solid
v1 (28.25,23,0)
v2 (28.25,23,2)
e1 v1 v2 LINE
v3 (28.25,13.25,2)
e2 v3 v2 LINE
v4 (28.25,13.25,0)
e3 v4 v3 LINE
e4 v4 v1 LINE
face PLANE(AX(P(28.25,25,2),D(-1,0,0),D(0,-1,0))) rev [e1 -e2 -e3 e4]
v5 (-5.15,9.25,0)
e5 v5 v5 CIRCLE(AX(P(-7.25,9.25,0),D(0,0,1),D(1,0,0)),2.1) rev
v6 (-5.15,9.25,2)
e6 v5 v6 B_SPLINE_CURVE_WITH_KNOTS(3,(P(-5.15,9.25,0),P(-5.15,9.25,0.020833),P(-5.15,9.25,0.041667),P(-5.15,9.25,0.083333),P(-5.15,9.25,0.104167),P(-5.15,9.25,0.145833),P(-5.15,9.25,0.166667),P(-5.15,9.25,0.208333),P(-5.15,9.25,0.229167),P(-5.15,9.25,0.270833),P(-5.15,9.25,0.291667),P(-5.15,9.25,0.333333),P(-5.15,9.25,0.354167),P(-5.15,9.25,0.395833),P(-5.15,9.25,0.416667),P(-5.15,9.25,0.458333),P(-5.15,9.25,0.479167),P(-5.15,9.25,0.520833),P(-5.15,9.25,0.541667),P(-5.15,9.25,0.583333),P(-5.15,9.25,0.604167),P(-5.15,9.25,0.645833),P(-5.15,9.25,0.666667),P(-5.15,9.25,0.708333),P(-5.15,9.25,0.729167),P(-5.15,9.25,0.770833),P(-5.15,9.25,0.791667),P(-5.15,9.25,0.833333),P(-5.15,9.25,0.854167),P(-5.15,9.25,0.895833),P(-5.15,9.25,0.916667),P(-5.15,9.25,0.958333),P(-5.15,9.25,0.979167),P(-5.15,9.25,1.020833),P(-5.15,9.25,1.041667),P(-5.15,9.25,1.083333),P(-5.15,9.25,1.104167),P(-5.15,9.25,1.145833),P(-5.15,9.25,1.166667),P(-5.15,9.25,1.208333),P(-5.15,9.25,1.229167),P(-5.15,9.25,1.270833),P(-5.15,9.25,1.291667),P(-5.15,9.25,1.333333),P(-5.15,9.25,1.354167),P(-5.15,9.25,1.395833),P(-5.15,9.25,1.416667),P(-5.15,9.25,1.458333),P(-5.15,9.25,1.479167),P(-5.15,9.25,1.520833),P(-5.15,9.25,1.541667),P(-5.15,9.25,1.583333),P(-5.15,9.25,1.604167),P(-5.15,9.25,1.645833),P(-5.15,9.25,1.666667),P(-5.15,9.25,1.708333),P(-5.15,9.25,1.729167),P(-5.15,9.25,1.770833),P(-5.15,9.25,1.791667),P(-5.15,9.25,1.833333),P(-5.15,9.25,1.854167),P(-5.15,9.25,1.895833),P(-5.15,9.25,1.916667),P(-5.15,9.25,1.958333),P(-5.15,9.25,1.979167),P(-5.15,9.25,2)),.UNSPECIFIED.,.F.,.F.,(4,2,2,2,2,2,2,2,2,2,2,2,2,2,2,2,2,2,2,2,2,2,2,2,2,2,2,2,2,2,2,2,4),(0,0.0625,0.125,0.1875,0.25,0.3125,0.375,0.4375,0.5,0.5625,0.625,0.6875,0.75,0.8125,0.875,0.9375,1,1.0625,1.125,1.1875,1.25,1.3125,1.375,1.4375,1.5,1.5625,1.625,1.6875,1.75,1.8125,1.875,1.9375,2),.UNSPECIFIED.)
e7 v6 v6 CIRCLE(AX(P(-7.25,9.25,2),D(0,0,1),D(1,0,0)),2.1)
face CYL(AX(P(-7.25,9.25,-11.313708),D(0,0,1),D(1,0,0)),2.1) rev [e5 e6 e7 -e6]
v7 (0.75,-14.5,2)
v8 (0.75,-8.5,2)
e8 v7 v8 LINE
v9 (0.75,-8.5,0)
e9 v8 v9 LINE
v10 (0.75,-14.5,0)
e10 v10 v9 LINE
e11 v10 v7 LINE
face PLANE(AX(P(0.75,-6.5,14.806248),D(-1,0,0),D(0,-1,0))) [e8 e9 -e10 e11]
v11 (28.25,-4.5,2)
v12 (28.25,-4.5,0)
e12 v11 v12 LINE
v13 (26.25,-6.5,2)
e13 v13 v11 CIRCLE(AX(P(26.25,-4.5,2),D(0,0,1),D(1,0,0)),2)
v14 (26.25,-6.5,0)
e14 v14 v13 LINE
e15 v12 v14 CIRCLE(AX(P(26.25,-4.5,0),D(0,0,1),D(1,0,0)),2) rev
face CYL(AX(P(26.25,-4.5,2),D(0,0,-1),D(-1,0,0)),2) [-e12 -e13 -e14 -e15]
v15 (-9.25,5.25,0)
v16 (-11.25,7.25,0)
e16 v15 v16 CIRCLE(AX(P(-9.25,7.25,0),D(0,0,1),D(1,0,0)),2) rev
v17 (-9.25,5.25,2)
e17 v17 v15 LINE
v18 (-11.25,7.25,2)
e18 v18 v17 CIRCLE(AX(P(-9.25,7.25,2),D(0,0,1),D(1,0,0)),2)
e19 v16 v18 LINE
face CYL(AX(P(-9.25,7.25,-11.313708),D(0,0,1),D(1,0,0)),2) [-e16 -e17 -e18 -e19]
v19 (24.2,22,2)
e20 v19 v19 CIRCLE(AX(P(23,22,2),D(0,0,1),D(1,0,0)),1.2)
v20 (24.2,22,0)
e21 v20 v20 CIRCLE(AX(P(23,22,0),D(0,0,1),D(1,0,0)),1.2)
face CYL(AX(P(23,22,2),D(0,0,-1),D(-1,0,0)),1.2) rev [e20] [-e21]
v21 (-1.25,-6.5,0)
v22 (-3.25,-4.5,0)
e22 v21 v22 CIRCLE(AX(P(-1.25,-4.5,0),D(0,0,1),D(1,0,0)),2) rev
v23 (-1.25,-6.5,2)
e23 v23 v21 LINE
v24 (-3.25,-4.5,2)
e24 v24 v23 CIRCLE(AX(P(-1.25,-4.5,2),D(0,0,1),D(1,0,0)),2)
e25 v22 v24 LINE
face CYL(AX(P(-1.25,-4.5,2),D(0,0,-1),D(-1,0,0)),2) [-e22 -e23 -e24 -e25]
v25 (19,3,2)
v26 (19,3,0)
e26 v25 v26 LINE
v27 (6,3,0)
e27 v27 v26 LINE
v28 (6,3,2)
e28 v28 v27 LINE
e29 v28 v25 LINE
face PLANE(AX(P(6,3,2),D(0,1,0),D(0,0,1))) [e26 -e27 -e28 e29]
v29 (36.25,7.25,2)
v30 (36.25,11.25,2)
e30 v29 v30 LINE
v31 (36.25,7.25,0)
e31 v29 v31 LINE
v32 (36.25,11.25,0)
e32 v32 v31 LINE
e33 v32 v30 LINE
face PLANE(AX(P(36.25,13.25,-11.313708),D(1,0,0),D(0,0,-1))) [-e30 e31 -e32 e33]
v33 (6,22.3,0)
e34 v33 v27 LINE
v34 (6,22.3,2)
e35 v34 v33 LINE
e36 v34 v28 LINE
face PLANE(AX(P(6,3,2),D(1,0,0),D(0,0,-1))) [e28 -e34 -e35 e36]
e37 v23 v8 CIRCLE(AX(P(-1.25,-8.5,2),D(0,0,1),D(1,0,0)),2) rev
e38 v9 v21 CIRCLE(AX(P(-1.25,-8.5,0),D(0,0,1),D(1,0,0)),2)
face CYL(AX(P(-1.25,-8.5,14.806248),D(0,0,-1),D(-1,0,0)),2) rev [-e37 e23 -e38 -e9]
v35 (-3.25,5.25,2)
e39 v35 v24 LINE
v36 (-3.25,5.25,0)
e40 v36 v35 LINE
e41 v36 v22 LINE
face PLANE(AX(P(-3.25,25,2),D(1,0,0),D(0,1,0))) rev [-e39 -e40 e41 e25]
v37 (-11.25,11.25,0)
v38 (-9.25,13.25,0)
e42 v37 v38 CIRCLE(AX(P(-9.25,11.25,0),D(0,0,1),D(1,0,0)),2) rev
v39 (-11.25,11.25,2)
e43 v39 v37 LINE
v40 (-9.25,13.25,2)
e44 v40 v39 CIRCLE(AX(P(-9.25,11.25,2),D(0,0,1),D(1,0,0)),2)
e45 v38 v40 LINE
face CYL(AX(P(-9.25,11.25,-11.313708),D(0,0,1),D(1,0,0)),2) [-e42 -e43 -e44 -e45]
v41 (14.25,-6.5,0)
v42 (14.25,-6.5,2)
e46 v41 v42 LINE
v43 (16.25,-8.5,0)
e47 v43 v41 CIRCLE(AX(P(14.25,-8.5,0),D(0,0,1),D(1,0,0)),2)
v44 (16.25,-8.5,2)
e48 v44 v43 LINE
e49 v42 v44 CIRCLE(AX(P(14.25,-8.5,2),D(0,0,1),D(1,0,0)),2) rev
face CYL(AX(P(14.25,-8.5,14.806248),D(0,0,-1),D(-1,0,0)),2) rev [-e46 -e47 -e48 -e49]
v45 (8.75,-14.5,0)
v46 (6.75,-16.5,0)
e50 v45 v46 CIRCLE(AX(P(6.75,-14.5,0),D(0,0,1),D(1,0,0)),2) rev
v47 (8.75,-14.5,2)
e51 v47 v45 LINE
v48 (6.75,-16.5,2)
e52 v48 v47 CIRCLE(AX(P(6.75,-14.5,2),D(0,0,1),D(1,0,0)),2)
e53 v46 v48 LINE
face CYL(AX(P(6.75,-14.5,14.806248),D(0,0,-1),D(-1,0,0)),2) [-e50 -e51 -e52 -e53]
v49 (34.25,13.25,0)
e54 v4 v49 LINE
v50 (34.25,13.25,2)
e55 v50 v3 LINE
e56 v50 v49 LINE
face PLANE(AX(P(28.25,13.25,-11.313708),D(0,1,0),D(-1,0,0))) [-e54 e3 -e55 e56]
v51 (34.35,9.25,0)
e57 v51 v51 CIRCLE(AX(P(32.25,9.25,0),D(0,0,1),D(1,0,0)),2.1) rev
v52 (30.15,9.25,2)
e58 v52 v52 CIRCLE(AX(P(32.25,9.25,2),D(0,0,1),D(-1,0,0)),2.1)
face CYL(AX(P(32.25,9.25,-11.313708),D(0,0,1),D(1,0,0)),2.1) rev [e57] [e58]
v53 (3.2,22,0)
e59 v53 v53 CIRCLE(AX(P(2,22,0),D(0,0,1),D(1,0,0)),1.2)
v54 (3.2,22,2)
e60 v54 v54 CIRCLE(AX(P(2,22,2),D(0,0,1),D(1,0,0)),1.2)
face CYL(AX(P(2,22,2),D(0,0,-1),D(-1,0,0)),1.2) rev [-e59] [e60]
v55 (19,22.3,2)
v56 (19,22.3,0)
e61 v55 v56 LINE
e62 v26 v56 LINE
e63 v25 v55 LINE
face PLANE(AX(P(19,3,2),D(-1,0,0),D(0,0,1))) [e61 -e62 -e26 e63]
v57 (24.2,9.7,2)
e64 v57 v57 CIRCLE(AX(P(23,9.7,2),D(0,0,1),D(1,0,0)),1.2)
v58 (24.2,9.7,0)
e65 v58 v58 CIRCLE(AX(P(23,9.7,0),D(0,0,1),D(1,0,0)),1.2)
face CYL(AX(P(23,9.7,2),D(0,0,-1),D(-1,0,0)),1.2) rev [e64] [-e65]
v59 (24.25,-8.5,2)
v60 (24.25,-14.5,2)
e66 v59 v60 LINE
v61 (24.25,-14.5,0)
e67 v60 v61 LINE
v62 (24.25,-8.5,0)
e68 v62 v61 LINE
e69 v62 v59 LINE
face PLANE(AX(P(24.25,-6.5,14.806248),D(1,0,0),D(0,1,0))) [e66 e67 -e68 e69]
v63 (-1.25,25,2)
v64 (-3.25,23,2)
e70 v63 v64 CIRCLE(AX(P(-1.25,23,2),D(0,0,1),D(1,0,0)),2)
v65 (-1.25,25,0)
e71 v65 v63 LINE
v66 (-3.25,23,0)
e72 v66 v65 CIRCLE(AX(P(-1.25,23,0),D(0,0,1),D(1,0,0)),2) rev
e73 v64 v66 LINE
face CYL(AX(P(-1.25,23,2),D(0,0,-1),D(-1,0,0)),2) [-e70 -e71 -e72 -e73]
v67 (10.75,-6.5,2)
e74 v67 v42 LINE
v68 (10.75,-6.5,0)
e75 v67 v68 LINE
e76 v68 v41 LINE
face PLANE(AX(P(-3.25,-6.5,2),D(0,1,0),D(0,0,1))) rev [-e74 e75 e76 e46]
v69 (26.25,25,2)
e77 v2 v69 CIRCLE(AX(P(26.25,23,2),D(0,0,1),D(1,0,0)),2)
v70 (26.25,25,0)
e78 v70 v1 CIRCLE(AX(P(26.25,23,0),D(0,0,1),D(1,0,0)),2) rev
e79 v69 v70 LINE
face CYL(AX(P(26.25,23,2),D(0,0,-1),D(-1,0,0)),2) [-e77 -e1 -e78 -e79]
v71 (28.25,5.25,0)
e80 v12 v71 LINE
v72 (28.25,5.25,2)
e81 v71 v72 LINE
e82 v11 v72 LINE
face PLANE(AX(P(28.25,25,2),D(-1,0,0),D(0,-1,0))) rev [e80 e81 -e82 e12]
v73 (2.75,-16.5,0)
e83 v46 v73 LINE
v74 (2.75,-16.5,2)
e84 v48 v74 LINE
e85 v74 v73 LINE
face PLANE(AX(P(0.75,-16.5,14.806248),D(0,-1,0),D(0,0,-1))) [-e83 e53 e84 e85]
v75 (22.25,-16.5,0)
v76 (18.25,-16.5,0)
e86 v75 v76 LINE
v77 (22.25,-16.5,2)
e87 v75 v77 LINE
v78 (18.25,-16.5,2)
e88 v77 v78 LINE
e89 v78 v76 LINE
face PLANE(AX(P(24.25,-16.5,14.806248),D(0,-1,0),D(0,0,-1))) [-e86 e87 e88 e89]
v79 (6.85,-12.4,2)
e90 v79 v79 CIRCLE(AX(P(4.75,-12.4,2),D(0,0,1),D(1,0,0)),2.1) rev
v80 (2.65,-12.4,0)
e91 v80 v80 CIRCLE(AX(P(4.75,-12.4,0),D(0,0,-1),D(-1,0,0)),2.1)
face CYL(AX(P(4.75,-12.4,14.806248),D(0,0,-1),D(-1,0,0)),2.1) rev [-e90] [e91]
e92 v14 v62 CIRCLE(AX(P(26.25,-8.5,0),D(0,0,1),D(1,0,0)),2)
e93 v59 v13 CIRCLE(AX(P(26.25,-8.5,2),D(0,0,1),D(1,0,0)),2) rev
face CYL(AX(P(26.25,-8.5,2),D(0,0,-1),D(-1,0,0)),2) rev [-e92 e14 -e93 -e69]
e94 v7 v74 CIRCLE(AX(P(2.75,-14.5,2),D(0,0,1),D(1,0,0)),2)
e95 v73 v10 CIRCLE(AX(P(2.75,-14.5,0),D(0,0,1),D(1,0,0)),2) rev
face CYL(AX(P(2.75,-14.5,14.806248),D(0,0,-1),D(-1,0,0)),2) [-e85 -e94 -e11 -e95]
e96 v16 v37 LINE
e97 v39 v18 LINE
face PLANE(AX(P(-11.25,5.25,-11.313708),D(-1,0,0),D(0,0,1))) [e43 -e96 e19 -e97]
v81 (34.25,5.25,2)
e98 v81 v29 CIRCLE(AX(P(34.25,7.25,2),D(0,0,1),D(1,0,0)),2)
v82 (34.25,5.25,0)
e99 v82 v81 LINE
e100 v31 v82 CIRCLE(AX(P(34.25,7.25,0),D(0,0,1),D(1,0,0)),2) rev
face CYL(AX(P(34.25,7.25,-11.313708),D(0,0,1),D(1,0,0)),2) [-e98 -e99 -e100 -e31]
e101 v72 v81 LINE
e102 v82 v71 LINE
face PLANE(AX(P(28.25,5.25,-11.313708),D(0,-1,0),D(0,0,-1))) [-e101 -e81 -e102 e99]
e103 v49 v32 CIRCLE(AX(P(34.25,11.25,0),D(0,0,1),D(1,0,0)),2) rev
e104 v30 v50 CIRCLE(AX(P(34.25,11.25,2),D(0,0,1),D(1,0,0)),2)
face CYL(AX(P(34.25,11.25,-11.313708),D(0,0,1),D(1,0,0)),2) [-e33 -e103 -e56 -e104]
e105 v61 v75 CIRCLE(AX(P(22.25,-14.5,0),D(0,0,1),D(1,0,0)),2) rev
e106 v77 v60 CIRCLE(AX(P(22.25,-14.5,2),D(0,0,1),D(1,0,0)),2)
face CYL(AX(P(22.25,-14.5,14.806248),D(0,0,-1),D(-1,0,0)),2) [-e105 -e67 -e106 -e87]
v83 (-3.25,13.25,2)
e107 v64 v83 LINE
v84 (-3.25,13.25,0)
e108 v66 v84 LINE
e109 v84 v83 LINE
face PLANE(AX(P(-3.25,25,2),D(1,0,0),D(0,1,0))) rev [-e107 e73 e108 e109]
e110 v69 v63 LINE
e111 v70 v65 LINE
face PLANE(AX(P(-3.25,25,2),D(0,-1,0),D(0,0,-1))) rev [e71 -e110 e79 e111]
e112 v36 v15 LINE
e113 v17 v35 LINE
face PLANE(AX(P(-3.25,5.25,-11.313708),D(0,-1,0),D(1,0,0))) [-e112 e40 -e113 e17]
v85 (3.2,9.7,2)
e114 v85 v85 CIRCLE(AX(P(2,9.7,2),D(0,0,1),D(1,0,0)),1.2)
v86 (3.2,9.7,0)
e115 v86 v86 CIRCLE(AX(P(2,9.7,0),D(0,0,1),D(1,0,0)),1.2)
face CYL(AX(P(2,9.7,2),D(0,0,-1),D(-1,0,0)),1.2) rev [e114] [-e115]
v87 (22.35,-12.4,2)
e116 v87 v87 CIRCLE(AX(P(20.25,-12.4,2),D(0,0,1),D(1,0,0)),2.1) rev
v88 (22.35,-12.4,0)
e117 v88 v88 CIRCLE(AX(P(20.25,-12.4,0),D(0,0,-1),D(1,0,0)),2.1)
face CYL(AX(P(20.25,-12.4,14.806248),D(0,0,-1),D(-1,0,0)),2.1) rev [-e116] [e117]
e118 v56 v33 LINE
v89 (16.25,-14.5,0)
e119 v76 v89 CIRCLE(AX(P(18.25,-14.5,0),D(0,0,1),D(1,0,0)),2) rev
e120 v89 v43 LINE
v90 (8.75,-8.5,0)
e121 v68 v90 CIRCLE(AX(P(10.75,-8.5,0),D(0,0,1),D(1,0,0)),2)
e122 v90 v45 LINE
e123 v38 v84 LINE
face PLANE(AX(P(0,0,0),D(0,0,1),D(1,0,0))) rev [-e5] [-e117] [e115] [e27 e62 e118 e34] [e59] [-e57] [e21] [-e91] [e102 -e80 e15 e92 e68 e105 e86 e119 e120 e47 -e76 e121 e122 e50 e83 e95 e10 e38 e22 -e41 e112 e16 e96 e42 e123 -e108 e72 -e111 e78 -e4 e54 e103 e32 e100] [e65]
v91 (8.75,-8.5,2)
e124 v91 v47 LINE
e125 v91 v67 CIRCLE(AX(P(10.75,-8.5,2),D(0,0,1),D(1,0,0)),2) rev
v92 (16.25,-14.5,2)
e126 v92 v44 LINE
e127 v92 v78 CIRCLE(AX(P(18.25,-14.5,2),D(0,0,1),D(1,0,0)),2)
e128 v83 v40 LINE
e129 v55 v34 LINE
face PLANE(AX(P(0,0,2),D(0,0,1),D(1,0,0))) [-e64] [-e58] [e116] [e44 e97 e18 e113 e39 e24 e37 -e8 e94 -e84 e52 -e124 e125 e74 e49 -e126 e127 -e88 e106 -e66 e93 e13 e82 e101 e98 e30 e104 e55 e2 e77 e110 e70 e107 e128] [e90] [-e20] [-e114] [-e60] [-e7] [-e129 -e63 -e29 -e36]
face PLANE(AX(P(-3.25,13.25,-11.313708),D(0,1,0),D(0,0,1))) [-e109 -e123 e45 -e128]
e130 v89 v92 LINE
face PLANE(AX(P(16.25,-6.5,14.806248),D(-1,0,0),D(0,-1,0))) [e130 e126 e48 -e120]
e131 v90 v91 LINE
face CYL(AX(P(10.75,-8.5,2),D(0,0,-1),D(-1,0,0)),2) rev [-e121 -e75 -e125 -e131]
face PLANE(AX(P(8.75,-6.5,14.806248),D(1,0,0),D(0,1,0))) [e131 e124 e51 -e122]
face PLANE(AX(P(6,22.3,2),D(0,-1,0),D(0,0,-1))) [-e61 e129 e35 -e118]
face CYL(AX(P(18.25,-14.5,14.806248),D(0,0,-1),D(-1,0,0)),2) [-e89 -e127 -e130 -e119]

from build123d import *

# Parameters (mm, degrees)
SKETCH1_W             = 31.5
SKETCH1_H             = 31.5
SKETCH1_R             = 1.2
SKETCH1_W_2           = 13
SKETCH1_H_2           = 19.3
BOSS_EXTRUDE1_DEPTH   = 2
SKETCH4_W             = 8
SKETCH4_H             = 8
SKETCH4_R             = 2.1
BOSS_EXTRUDE3_DEPTH   = 2
CIRPATTERN2_OUTLINE_W = 8
CIRPATTERN2_OUTLINE_H = 8
CIRPATTERN2_OUTLINE_R = 2.1
CIRPATTERN2_DEPTH     = 2
SKETCH5_W             = 8
SKETCH5_H             = 10
SKETCH5_R             = 2.1
BOSS_EXTRUDE4_DEPTH   = 2
FILLET1_R             = 2


# Read off the part's stored shape, not the designer's step: CirPattern2
with BuildPart() as part:
    # Sketch1 → Boss-Extrude1 (new body)
    with BuildSketch(Plane.XY):
        with Locations((12.5, 9.25)):
            Rectangle(SKETCH1_W, SKETCH1_H)
        with Locations((2, 22)):
            Circle(SKETCH1_R, mode=Mode.SUBTRACT)
        with Locations((23, 22)):
            Circle(SKETCH1_R, mode=Mode.SUBTRACT)
        with Locations((23, 9.7)):
            Circle(SKETCH1_R, mode=Mode.SUBTRACT)
        with Locations((2, 9.7)):
            Circle(SKETCH1_R, mode=Mode.SUBTRACT)
        with Locations((12.5, 12.65)):
            Rectangle(SKETCH1_W_2, SKETCH1_H_2, mode=Mode.SUBTRACT)
    extrude(amount=BOSS_EXTRUDE1_DEPTH)

    # Sketch4 → Boss-Extrude3 (add)
    with BuildSketch(Plane.XY.offset(2)):
        with Locations((-7.25, 9.25)):
            Rectangle(SKETCH4_W, SKETCH4_H)
        with Locations((-7.25, 9.25)):
            Circle(SKETCH4_R, mode=Mode.SUBTRACT)
    extrude(amount=-BOSS_EXTRUDE3_DEPTH)

    # CirPattern2 outline → CirPattern2 (add)
    with BuildSketch(Plane.XY):
        with Locations((32.25, 9.25)):
            Rectangle(CIRPATTERN2_OUTLINE_W, CIRPATTERN2_OUTLINE_H)
        with Locations((32.25, 9.25)):
            Circle(CIRPATTERN2_OUTLINE_R, mode=Mode.SUBTRACT)
    extrude(amount=CIRPATTERN2_DEPTH)

    # Sketch5 → Boss-Extrude4 (add)
    # profile 1 of 2: a face of its own
    with BuildSketch(Plane(origin=(0, 0, 0), x_dir=(-1, 0, 0), z_dir=(0, 0, -1))):
        with Locations((-4.75, -11.5)):
            Rectangle(SKETCH5_W, SKETCH5_H)
        with Locations((-4.75, -12.4)):
            Circle(SKETCH5_R, mode=Mode.SUBTRACT)
    # profile 2 of 2: a face of its own
    with BuildSketch(Plane(origin=(0, 0, 0), x_dir=(-1, 0, 0), z_dir=(0, 0, -1))):
        with Locations((-20.25, -11.5)):
            Rectangle(SKETCH5_W, SKETCH5_H)
        with Locations(Location((-20.25, -12.4, 0), (0, 0, 180))):
            Circle(SKETCH5_R, mode=Mode.SUBTRACT)
    extrude(amount=-BOSS_EXTRUDE4_DEPTH)

    # Fillet1
    fillet1_edges = [part.edges().sort_by_distance(p)[0] for p in [
        (-11.25, 13.25, 1),
        (-11.25, 5.25, 1),
        (36.25, 5.25, 1),
        (36.25, 13.25, 1),
        (0.75, -6.5, 1),
        (0.75, -16.5, 1),
        (8.75, -16.5, 1),
        (8.75, -6.5, 1),
        (-3.25, 25, 1),
        (28.25, 25, 1),
        (28.25, -6.5, 1),
        (-3.25, -6.5, 1),
        (24.25, -16.5, 1),
        (24.25, -6.5, 1),
        (16.25, -6.5, 1),
        (16.25, -16.5, 1),
    ]]
    fillet(fillet1_edges, radius=FILLET1_R - 0.0001)  # a hair under: the kernel refuses the full size


solid = part.part
